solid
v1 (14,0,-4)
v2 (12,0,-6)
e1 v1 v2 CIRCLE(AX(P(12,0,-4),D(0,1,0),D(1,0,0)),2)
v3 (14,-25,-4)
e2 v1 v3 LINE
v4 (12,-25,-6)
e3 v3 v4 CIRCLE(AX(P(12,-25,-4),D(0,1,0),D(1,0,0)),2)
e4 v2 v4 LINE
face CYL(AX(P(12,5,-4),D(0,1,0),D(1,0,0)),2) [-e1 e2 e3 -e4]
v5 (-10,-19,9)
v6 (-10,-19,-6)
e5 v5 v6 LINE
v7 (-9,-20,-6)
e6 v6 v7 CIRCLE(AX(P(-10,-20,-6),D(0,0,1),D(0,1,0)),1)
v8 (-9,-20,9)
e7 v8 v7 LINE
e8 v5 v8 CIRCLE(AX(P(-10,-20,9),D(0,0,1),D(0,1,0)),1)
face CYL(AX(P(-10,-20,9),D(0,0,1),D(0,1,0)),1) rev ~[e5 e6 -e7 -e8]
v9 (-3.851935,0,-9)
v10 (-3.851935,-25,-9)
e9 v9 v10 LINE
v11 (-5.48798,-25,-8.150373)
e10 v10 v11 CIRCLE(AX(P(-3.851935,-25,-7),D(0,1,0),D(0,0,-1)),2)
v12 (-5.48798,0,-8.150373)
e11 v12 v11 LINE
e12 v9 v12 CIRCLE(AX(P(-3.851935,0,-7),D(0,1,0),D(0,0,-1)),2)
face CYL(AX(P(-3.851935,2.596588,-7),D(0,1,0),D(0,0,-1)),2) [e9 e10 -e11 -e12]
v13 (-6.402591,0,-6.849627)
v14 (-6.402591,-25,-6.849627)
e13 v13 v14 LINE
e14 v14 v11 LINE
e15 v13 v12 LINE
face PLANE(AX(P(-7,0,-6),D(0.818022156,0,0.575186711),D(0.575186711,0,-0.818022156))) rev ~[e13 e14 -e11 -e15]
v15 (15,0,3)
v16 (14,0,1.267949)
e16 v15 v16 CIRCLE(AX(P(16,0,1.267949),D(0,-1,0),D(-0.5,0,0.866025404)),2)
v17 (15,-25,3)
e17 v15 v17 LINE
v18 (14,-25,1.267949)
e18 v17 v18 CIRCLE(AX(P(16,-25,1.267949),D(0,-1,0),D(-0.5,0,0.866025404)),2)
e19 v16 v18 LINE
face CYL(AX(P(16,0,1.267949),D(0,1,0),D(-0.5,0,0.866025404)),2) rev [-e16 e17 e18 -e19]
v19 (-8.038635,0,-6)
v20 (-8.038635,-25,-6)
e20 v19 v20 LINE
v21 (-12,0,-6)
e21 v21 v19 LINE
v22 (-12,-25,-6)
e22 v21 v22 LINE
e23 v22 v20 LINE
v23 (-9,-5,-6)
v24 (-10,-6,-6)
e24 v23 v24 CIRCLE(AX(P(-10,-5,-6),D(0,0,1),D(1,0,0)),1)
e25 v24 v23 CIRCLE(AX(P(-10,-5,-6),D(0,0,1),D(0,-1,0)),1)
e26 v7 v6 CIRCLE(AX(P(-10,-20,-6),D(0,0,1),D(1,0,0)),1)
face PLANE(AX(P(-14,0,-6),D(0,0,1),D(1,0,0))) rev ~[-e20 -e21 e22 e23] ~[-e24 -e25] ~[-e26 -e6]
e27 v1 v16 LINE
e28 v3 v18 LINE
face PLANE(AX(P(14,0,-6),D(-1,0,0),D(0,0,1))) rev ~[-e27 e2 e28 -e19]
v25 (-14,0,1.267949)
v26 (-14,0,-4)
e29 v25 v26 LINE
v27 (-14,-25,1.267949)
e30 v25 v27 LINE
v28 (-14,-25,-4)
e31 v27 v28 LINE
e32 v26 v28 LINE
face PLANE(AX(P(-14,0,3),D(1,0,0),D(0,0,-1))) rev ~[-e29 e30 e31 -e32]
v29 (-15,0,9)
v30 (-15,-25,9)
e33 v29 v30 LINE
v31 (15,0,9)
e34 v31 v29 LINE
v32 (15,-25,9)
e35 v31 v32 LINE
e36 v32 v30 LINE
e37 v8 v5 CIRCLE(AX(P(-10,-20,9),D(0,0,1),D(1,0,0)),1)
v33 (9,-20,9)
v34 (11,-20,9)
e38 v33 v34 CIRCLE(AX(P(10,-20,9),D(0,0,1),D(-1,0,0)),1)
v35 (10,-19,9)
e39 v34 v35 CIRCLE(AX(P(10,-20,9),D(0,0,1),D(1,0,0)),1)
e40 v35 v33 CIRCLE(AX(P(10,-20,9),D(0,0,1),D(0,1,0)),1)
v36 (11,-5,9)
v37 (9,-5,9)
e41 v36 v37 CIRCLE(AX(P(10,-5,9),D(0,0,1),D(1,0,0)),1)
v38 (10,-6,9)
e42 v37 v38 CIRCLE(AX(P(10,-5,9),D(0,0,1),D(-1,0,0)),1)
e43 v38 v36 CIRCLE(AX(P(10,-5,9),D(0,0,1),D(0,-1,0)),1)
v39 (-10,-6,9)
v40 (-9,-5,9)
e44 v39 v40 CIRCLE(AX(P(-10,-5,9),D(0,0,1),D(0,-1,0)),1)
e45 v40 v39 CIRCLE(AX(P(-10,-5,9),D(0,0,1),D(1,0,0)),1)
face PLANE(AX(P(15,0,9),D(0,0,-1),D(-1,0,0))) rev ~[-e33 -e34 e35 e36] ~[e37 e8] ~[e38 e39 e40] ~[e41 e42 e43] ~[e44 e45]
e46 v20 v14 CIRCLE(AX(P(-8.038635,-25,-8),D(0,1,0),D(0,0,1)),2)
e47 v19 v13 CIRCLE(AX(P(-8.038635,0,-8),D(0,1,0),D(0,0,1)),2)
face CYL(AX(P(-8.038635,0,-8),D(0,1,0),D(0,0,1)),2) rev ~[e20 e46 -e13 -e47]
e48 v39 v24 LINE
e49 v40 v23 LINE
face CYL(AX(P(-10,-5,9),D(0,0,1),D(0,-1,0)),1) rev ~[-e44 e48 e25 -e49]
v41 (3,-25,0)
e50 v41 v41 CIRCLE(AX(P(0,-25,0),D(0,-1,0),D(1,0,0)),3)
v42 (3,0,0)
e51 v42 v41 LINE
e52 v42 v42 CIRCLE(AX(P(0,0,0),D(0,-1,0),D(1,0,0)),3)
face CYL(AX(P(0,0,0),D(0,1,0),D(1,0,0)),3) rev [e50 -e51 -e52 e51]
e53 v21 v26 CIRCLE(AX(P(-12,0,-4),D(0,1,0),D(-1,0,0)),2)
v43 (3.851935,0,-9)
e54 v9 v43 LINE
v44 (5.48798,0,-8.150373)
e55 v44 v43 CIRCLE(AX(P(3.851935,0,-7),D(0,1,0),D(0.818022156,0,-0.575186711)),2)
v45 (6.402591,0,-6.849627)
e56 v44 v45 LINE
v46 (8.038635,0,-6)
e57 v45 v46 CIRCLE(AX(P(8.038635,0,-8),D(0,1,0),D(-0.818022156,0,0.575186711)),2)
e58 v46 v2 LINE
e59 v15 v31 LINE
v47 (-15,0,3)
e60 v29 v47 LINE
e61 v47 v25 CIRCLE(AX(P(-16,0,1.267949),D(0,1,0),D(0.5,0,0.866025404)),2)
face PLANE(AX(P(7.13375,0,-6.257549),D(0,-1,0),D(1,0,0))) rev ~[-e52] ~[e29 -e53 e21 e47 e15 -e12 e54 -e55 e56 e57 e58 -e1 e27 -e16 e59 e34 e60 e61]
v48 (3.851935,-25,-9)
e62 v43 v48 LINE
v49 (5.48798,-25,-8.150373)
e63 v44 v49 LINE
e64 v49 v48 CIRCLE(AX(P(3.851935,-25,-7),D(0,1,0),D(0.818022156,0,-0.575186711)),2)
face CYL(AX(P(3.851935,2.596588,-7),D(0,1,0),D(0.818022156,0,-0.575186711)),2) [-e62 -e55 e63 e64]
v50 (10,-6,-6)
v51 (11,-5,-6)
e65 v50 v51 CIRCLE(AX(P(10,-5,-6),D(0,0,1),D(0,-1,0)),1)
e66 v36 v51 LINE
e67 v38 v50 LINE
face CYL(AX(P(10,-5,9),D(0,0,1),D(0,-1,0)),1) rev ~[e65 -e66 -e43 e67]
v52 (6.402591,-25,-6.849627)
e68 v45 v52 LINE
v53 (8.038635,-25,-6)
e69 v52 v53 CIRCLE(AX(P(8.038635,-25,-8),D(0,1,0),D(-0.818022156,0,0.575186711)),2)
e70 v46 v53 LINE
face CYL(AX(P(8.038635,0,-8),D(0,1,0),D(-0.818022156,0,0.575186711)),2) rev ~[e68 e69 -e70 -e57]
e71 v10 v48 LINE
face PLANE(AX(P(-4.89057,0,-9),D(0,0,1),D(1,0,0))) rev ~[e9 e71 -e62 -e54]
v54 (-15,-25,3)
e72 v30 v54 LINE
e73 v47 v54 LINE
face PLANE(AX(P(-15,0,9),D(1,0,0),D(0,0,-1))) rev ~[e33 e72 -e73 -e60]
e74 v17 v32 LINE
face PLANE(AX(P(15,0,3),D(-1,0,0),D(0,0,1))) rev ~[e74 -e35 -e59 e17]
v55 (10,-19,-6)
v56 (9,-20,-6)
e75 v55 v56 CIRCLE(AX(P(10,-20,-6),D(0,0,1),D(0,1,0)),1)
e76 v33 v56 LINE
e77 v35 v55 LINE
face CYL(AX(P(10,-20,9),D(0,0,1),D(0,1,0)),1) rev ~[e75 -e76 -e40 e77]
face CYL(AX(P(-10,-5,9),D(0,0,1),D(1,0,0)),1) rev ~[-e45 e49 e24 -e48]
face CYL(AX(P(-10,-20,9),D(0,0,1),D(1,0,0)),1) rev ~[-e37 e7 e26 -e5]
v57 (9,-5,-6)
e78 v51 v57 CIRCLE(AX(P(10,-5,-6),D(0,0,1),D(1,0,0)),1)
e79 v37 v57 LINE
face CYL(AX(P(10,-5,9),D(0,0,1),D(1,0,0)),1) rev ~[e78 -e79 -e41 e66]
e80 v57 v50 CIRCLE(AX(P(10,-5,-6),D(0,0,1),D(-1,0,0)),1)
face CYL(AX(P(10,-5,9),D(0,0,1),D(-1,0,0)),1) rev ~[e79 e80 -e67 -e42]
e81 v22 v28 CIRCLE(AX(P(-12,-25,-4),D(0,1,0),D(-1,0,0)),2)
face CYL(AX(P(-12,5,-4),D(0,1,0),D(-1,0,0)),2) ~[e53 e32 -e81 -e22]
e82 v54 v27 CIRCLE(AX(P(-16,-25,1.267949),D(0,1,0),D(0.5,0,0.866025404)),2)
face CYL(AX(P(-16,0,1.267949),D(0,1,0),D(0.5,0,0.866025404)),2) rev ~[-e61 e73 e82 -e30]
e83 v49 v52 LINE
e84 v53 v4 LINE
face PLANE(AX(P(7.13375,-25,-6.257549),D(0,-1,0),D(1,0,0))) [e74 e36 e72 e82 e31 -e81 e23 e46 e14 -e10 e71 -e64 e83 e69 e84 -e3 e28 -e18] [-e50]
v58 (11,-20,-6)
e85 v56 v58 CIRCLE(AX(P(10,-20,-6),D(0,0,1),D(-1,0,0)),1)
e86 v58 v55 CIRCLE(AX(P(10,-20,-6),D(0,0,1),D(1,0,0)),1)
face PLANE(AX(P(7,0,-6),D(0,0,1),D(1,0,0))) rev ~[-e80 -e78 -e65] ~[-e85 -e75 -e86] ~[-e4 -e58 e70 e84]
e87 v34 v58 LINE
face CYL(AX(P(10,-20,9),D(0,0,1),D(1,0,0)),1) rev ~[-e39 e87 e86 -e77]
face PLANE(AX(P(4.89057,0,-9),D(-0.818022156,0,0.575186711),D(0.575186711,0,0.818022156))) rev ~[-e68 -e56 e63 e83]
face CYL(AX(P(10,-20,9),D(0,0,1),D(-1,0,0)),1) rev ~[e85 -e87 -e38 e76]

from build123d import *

# Parameters (mm, degrees)
F0_R         = 3
F1_DEPTH     = 25
F3_DEPTH     = 18.001
F4_T1_DEPTH  = 25
F4_T3_DEPTH  = 25
F4_T5_DEPTH  = 25
F4_T7_DEPTH  = 25
F4_T9_DEPTH  = 35
F4_T11_DEPTH = 30.1931758285
F4_T13_DEPTH = 30.1931758285
F4_T15_DEPTH = 35


# Not quite as in the source:
# - a fillet or chamfer that OpenCascade refuses, or shapes differently, is made with other operations: its cross-section is extruded or revolved along the edge and cut away or added


with BuildPart() as f1:
    # F0 (on Front) → F1 (new body)
    with BuildSketch(Plane.XZ):
        Polygon((15, 9), (-15, 9), (-15, 3), (-14, 3), (-14, -6), (-7, -6), (-4.890570417, -9), (4.890570417, -9), (7, -6), (14, -6), (14, 3), (15, 3), align=None)
        Circle(F0_R, mode=Mode.SUBTRACT)
    extrude(amount=F1_DEPTH)

    # F2 (on face) → F3 (cut, through all)
    with BuildSketch(Plane.XY.offset(9)):
        with BuildLine():
            Line((10, -5), (10, -6))
            ThreePointArc((10, -6), (10.7071067812, -5.7071067812), (11, -5))
            ThreePointArc((11, -5), (10, -4), (9, -5))
            Line((9, -5), (10, -5))
        make_face()
        with BuildLine():
            ThreePointArc((9, -5), (9.2928932188, -5.7071067812), (10, -6))
            Line((10, -6), (10, -5))
            Line((10, -5), (9, -5))
        make_face()
        with BuildLine():
            Line((10, -20), (9, -20))
            ThreePointArc((9, -20), (10, -21), (11, -20))
            ThreePointArc((11, -20), (10.7071067812, -19.2928932188), (10, -19))
            Line((10, -19), (10, -20))
        make_face()
        with BuildLine():
            ThreePointArc((10, -19), (9.2928932188, -19.2928932188), (9, -20))
            Line((9, -20), (10, -20))
            Line((10, -20), (10, -19))
        make_face()
        with BuildLine():
            ThreePointArc((-10, -19), (-10.7071067812, -20.7071067812), (-9, -20))
            Line((-9, -20), (-10, -20))
            Line((-10, -20), (-10, -19))
        make_face()
        with BuildLine():
            Line((-10, -20), (-9, -20))
            ThreePointArc((-9, -20), (-9.2928932188, -19.2928932188), (-10, -19))
            Line((-10, -19), (-10, -20))
        make_face()
        with BuildLine():
            ThreePointArc((-9, -5), (-10.7071067812, -4.2928932188), (-10, -6))
            Line((-10, -6), (-10, -5))
            Line((-10, -5), (-9, -5))
        make_face()
        with BuildLine():
            Line((-10, -5), (-10, -6))
            ThreePointArc((-10, -6), (-9.2928932188, -5.7071067812), (-9, -5))
            Line((-9, -5), (-10, -5))
        make_face()
    extrude(amount=-F3_DEPTH, mode=Mode.SUBTRACT)

    # F4: fillet of radius 2 on 8 edges, made by hand

    # F4_s2 → F4_t1 (join)
    with BuildSketch(Plane.XZ):
        with BuildLine():
            ThreePointArc((15, 3), (14.2679491924, 2.2679491924), (14, 1.2679491924))
            Line((14, 1.2679491924), (14, 3))
            Line((14, 3), (15, 3))
        make_face()
    extrude(amount=F4_T1_DEPTH)

    # F4_s4 → F4_t3 (join)
    with BuildSketch(Plane.XZ):
        with BuildLine():
            ThreePointArc((-15, 3), (-14.2679491924, 2.2679491924), (-14, 1.2679491924))
            Line((-14, 1.2679491924), (-14, 3))
            Line((-14, 3), (-15, 3))
        make_face()
    extrude(amount=F4_T3_DEPTH)

    # F4_s6 → F4_t5 (join)
    with BuildSketch(Plane.XZ):
        with BuildLine():
            ThreePointArc((-8.0386351657, -6), (-7.1168832592, -6.2250708682), (-6.4025908546, -6.8496265771))
            Line((-6.4025908546, -6.8496265771), (-7, -6))
            Line((-7, -6), (-8.0386351657, -6))
        make_face()
    extrude(amount=F4_T5_DEPTH)

    # F4_s8 → F4_t7 (join)
    with BuildSketch(Plane.XZ):
        with BuildLine():
            ThreePointArc((6.4025908546, -6.8496265771), (7.1168832592, -6.2250708682), (8.0386351657, -6))
            Line((8.0386351657, -6), (7, -6))
            Line((7, -6), (6.4025908546, -6.8496265771))
        make_face()
    extrude(amount=F4_T7_DEPTH)

    # F4_s10 → F4_t9 (cut)
    with BuildSketch(Plane.XZ.offset(-5)):
        with BuildLine():
            ThreePointArc((-14, -4), (-13.4142135624, -5.4142135624), (-12, -6))
            Line((-12, -6), (-14, -6))
            Line((-14, -6), (-14, -4))
        make_face()
    extrude(amount=F4_T9_DEPTH, mode=Mode.SUBTRACT)

    # F4_s12 → F4_t11 (cut)
    with BuildSketch(Plane.XZ.offset(-2.5965879143)):
        with BuildLine():
            ThreePointArc((-3.8519352513, -9), (-4.7736871578, -8.7749291318), (-5.4879795624, -8.1503734229))
            Line((-5.4879795624, -8.1503734229), (-4.890570417, -9))
            Line((-4.890570417, -9), (-3.8519352513, -9))
        make_face()
    extrude(amount=F4_T11_DEPTH, mode=Mode.SUBTRACT)

    # F4_s14 → F4_t13 (cut)
    with BuildSketch(Plane.XZ.offset(-2.5965879143)):
        with BuildLine():
            ThreePointArc((5.4879795624, -8.1503734229), (4.7736871578, -8.7749291318), (3.8519352513, -9))
            Line((3.8519352513, -9), (4.890570417, -9))
            Line((4.890570417, -9), (5.4879795624, -8.1503734229))
        make_face()
    extrude(amount=F4_T13_DEPTH, mode=Mode.SUBTRACT)

    # F4_s16 → F4_t15 (cut)
    with BuildSketch(Plane.XZ.offset(-5)):
        with BuildLine():
            ThreePointArc((14, -4), (13.4142135624, -5.4142135624), (12, -6))
            Line((12, -6), (14, -6))
            Line((14, -6), (14, -4))
        make_face()
    extrude(amount=F4_T15_DEPTH, mode=Mode.SUBTRACT)


solid = f1.part
